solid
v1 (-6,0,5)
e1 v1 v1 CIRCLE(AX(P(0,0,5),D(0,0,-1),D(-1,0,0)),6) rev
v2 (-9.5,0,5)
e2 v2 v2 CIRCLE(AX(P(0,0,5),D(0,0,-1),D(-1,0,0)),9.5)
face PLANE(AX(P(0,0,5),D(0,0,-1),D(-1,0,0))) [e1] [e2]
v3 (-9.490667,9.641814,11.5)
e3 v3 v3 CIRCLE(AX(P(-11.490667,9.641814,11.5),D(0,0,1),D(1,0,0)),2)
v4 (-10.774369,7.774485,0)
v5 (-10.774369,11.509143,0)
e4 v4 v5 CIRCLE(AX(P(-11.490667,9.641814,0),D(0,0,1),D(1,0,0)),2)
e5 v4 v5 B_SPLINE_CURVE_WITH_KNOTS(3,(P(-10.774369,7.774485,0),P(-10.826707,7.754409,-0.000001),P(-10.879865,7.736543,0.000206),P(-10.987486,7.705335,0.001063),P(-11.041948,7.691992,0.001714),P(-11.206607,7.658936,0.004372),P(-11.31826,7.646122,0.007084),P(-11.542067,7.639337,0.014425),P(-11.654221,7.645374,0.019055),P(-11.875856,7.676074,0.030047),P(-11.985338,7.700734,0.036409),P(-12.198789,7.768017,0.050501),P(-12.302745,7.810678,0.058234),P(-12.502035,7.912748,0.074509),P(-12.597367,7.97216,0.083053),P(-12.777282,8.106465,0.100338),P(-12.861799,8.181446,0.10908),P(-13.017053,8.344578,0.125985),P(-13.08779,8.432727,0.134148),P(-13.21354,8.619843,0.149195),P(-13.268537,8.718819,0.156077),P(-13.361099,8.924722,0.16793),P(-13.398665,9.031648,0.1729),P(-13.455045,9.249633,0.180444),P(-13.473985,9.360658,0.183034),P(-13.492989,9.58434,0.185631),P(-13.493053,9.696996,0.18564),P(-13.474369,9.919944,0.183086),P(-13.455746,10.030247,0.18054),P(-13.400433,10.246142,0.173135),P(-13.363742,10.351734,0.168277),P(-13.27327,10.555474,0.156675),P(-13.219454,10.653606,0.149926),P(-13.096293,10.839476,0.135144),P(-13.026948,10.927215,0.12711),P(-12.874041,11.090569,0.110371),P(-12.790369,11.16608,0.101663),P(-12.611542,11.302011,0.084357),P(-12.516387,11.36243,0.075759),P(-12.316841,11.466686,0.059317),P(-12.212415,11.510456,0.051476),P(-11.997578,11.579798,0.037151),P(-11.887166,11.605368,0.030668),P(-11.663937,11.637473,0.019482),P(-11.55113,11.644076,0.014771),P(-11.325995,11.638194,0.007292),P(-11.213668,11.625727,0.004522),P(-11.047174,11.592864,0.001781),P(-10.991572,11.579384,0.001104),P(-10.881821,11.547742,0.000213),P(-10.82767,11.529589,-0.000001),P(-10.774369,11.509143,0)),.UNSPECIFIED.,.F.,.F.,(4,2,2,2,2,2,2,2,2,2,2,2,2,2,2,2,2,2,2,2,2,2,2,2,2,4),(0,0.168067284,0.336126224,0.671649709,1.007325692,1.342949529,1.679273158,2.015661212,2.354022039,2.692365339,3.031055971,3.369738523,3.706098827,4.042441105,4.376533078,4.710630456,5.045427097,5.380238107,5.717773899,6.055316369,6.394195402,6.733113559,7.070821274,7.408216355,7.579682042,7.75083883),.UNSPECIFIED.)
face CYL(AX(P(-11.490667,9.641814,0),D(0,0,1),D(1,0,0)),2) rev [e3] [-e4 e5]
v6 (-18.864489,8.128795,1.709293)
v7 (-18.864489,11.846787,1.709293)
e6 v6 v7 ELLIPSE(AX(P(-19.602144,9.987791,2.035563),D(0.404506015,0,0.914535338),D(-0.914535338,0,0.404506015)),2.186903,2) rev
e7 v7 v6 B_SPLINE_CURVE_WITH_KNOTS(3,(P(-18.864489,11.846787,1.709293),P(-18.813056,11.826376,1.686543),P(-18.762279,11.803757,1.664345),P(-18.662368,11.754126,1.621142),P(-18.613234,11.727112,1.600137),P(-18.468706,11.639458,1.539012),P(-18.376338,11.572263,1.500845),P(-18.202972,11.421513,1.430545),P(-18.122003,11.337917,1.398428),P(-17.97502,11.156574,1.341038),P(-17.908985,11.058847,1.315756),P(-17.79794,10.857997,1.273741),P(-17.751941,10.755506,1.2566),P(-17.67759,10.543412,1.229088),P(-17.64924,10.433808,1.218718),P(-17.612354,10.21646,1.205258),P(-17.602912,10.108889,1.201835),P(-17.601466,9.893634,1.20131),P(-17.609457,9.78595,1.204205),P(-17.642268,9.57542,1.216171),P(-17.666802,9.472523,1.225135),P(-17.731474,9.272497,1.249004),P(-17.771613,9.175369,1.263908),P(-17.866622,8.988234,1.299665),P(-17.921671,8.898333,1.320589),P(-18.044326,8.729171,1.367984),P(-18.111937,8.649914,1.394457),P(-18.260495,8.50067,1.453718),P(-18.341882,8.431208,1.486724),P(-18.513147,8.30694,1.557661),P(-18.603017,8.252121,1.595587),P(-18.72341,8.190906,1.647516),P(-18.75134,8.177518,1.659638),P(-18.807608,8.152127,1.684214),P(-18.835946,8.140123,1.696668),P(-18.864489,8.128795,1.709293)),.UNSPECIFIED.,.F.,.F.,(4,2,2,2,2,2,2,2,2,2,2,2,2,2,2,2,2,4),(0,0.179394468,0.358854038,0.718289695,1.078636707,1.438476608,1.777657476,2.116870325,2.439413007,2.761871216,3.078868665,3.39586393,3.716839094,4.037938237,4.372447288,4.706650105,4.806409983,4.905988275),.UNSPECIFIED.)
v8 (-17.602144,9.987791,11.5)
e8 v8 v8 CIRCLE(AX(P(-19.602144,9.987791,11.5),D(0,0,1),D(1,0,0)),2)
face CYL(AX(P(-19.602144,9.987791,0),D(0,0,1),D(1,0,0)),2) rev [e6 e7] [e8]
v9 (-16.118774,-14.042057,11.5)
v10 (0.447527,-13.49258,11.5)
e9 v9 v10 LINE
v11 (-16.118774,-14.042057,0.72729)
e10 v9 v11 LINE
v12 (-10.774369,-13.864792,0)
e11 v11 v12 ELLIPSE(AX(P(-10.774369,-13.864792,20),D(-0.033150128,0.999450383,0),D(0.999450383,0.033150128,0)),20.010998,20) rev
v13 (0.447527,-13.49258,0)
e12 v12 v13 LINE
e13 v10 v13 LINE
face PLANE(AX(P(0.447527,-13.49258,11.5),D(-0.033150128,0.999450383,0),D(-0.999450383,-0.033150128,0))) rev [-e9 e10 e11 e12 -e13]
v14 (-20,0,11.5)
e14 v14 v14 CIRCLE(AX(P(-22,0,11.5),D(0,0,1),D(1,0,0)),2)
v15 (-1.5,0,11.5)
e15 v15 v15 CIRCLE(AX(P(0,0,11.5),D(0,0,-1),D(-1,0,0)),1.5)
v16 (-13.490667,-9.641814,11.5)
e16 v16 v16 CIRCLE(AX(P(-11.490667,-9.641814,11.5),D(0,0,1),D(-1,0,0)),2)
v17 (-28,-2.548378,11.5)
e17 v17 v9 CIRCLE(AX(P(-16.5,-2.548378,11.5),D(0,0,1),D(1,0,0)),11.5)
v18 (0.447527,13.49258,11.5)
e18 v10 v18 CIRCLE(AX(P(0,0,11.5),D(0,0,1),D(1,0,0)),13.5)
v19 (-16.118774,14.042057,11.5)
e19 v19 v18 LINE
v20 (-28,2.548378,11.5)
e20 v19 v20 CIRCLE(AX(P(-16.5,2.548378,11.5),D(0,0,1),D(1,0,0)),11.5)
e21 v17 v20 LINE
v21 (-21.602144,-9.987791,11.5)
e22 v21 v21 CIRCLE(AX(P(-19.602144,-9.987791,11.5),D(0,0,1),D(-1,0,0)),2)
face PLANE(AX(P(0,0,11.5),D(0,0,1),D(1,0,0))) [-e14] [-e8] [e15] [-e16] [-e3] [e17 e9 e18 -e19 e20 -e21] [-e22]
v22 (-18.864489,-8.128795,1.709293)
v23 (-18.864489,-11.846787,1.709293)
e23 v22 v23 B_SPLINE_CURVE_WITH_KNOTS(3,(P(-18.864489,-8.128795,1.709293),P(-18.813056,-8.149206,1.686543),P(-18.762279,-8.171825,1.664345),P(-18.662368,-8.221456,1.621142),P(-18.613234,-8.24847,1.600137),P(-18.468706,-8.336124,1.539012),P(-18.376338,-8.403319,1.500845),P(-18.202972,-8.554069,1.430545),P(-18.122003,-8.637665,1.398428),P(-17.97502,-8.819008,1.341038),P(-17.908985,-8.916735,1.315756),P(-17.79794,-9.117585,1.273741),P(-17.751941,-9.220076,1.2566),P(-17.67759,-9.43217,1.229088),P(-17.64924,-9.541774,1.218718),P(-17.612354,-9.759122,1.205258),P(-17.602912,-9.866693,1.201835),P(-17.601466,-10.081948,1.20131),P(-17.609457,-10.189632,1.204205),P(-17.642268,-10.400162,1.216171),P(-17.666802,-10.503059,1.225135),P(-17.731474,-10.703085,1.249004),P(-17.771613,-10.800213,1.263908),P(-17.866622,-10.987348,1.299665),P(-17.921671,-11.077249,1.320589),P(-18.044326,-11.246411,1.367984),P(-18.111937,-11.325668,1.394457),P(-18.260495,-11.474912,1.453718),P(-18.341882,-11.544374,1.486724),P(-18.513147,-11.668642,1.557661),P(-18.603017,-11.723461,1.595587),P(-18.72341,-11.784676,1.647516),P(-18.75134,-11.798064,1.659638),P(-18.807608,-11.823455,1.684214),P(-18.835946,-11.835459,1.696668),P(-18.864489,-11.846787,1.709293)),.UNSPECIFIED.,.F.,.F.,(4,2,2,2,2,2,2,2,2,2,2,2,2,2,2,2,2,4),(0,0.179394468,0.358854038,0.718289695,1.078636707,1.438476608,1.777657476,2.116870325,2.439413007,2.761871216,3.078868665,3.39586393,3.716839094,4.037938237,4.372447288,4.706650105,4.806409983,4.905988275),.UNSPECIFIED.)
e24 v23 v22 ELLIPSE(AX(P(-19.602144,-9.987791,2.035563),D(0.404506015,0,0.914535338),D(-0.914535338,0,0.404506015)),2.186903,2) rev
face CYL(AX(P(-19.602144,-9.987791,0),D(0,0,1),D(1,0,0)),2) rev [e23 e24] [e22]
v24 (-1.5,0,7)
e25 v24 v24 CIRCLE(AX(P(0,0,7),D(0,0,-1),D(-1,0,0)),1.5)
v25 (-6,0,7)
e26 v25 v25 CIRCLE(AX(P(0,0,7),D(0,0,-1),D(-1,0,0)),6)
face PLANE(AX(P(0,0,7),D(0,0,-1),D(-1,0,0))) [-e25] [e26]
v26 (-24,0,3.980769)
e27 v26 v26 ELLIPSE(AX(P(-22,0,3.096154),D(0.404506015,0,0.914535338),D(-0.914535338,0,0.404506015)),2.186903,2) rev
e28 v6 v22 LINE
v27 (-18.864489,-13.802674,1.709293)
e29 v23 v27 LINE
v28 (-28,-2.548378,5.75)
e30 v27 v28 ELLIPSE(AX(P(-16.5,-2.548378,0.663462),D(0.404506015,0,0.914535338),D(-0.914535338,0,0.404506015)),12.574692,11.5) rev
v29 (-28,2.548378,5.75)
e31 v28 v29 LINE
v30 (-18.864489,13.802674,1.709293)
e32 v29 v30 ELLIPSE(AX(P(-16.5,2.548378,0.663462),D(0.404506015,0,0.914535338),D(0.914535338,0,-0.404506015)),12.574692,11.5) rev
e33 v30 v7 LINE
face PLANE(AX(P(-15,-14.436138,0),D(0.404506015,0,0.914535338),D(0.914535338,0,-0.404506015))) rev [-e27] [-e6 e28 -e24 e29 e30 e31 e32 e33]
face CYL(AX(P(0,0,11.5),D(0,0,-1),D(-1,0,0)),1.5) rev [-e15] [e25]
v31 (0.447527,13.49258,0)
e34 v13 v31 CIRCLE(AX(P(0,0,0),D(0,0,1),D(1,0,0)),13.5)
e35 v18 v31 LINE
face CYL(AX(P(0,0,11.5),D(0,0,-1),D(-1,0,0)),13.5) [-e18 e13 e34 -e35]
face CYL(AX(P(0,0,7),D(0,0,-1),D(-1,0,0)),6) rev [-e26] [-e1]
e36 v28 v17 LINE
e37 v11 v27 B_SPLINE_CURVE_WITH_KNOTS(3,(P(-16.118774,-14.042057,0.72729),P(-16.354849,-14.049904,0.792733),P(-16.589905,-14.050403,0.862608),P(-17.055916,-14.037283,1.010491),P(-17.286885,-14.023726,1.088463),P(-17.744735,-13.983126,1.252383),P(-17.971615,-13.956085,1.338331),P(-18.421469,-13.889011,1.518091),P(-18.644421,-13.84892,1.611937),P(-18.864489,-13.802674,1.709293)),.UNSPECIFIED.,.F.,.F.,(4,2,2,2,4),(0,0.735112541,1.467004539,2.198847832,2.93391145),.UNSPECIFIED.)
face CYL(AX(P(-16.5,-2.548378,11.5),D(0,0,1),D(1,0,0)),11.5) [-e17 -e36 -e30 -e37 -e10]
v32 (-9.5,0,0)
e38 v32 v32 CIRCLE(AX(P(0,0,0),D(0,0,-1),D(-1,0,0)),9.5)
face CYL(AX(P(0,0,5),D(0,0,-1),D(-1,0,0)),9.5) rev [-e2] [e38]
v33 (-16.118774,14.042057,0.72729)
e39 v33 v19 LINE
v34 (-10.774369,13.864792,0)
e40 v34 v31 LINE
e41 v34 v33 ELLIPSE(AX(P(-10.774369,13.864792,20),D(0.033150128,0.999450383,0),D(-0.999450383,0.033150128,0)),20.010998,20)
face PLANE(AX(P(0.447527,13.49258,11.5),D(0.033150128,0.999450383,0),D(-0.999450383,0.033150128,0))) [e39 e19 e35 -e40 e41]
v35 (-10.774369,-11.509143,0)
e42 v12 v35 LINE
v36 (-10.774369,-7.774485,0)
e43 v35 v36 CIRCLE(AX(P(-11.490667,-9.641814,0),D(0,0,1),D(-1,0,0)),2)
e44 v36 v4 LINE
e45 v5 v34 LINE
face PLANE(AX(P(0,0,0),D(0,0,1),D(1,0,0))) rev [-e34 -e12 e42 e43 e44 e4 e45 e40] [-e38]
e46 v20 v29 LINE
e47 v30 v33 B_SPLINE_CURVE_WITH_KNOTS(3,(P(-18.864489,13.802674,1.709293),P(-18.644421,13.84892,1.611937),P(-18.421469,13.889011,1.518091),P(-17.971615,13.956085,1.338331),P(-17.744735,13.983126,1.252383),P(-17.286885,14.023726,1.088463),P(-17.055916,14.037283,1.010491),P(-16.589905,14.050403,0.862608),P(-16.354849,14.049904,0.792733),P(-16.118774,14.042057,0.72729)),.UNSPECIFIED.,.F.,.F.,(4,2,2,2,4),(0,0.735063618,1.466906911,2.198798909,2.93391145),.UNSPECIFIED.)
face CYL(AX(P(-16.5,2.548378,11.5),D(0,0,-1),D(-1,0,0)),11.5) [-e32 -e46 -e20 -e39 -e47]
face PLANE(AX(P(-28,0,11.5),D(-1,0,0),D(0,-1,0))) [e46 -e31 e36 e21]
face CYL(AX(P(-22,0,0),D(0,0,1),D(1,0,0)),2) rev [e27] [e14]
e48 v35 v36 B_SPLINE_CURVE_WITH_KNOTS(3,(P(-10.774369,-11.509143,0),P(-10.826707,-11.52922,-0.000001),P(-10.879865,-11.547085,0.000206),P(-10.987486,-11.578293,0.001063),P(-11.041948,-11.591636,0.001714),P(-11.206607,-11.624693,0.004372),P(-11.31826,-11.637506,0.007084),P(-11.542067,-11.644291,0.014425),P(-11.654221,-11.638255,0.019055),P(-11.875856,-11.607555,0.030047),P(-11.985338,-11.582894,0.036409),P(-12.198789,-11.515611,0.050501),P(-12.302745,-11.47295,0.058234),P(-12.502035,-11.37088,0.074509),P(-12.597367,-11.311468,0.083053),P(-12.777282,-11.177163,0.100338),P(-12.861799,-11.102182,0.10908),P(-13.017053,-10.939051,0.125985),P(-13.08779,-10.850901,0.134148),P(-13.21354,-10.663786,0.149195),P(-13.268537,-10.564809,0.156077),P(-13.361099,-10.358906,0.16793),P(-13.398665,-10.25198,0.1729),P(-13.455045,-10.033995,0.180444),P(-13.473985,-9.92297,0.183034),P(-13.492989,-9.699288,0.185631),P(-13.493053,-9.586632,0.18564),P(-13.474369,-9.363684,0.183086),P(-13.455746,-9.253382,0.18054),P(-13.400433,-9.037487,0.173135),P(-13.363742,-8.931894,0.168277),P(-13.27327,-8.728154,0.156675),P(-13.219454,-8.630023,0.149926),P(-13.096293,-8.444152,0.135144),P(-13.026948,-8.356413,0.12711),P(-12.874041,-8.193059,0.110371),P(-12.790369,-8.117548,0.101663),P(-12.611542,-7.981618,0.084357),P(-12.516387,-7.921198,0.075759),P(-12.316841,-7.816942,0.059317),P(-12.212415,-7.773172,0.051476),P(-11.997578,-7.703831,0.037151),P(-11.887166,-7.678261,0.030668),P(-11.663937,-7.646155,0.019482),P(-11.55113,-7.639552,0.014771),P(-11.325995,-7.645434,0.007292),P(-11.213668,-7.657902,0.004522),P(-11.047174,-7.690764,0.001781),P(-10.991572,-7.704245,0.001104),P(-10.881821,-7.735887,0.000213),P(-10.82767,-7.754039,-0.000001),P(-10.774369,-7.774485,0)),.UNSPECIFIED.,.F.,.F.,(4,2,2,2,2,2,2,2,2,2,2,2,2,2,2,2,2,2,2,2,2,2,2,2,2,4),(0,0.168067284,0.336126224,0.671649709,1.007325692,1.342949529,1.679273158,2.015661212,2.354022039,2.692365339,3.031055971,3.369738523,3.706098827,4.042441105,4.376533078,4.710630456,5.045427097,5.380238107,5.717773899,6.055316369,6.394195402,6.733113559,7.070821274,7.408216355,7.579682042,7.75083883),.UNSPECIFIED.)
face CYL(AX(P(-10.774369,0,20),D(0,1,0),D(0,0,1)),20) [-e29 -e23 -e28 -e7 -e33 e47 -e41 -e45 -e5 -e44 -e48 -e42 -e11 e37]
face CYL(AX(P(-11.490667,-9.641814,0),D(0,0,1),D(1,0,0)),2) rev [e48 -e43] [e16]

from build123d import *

# Parameters (mm, degrees)
CROQUIS1_R                 = 13.5
SALIENTE_EXTRUIR1_DEPTH    = 11.5
CROQUIS3_R                 = 2
CORTAR_EXTRUIR1_DEPTH      = 34.535832747
CORTAR_EXTRUIR2_DEPTH      = 34.535832747
CORTAR_EXTRUIR2_DEPTH_BACK = 34.535832747
REDONDEO1_R                = 20
REDONDEO2_R                = 11.5
CROQUIS5_R                 = 6
CORTAR_EXTRUIR3_DEPTH      = 7
CROQUIS6_R                 = 9.5
CORTAR_EXTRUIR4_DEPTH      = 5
CROQUIS7_R                 = 1.5
CORTAR_EXTRUIR5_DEPTH      = 33.099173306


with BuildPart() as part:
    # Croquis1 → Saliente-Extruir1 (new body)
    with BuildSketch(Plane.XY):
        with BuildLine():
            Line((0.447526726, 13.492580177), (-28, 14.436137919))
            Line((-28, 14.436137919), (-28, -14.436137919))
            Line((-28, -14.436137919), (0.447526726, -13.492580177))
            ThreePointArc((0.447526726, -13.492580177), (-13.5, 0), (0.447526726, 13.492580177))
        make_face()
        Circle(CROQUIS1_R)
    extrude(amount=SALIENTE_EXTRUIR1_DEPTH)

    # Croquis3 → Cortar-Extruir1 (cut, through all)
    with BuildSketch(Plane.XY.offset(11.5)):
        with Locations((-22, 0)):
            Circle(CROQUIS3_R)
        with Locations((-19.602143532, 9.987790994)):
            Circle(CROQUIS3_R)
        with Locations((-11.490666647, 9.641814145)):
            Circle(CROQUIS3_R)
        with Locations(Location((-19.602143532, -9.987790994, 0), (0, 0, 180))):
            Circle(CROQUIS3_R)
        with Locations(Location((-11.490666647, -9.641814145, 0), (0, 0, 180))):
            Circle(CROQUIS3_R)
    extrude(amount=-CORTAR_EXTRUIR1_DEPTH, mode=Mode.SUBTRACT)

    # Croquis4 → Cortar-Extruir2 (cut, two sides: drawn at the far end of the back side and taken through both)
    with BuildSketch(Plane(origin=(0, 0, 0), x_dir=(1, 0, 0), z_dir=(0, 1, 0)).offset(-CORTAR_EXTRUIR2_DEPTH_BACK)):
        Polygon((-15, 0), (-28, -5.75), (-28, 0), align=None)
    extrude(amount=CORTAR_EXTRUIR2_DEPTH + CORTAR_EXTRUIR2_DEPTH_BACK, mode=Mode.SUBTRACT)

    # Redondeo1
    # the kernel refuses this fillet: 20 mm, written as the material it takes off along each edge
    with BuildSketch(Plane(origin=(-15, -24.56902732, 0), x_dir=(1, 0, 0), z_dir=(0, 1, 0))) as redondeo1_piece_1:
        with BuildLine():
            CenterArc((REDONDEO1_R * 0.211281561014, -REDONDEO1_R), REDONDEO1_R, 90, 23.860175191)
            Line((-REDONDEO1_R * 0.193224453764, -REDONDEO1_R * 0.0854646622417), (0, 0))
            Line((0, 0), (REDONDEO1_R * 0.211281561014, 0))
        make_face()
    extrude(amount=49.138054639, mode=Mode.SUBTRACT)

    # Redondeo2
    # the kernel refuses this fillet: 11.5 mm, written as the material it takes off along each edge
    with BuildSketch(Plane(origin=(-28, 14.436137919, -23.969400449), x_dir=(0.9994503834734472, -0.033150127824481866, 0), z_dir=(0, 0, 1))) as redondeo2_piece_1:
        with BuildLine():
            CenterArc((REDONDEO2_R * 1.03371827647, -REDONDEO2_R), REDONDEO2_R, 90, 91.899710465)
            Line((REDONDEO2_R * 0.0342678929996, -REDONDEO2_R * 1.03315012782), (0, 0))
            Line((0, 0), (REDONDEO2_R * 1.03371827647, 0))
        make_face()
    extrude(amount=65.188800897, mode=Mode.SUBTRACT)
    with BuildSketch(Plane(origin=(-28, -14.436137919, -23.969400449), x_dir=(0.999450383473447, 0.033150127824482116, 0), z_dir=(0, 0, 1))) as redondeo2_piece_2:
        with BuildLine():
            CenterArc((REDONDEO2_R * 1.03371827647, REDONDEO2_R), REDONDEO2_R, 178.100289535, 91.899710465)
            Line((REDONDEO2_R * 0.0342678929996, REDONDEO2_R * 1.03315012782), (0, 0))
            Line((0, 0), (REDONDEO2_R * 1.03371827647, 0))
        make_face()
    extrude(amount=65.188800897, mode=Mode.SUBTRACT)

    # Croquis5 → Cortar-Extruir3 (cut)
    with BuildSketch(Plane(origin=(0, 0, 0), x_dir=(-1, 0, 0), z_dir=(0, 0, -1))):
        Circle(CROQUIS5_R)
    extrude(amount=-CORTAR_EXTRUIR3_DEPTH, mode=Mode.SUBTRACT)

    # Croquis6 → Cortar-Extruir4 (cut)
    with BuildSketch(Plane(origin=(0, 0, 0), x_dir=(-1, 0, 0), z_dir=(0, 0, -1))):
        Circle(CROQUIS6_R)
    extrude(amount=-CORTAR_EXTRUIR4_DEPTH, mode=Mode.SUBTRACT)

    # Croquis7 → Cortar-Extruir5 (cut, through all)
    with BuildSketch(Plane(origin=(0, 0, 7), x_dir=(-1, 0, 0), z_dir=(0, 0, -1))):
        Circle(CROQUIS7_R)
    extrude(amount=-CORTAR_EXTRUIR5_DEPTH, mode=Mode.SUBTRACT)


solid = part.part
